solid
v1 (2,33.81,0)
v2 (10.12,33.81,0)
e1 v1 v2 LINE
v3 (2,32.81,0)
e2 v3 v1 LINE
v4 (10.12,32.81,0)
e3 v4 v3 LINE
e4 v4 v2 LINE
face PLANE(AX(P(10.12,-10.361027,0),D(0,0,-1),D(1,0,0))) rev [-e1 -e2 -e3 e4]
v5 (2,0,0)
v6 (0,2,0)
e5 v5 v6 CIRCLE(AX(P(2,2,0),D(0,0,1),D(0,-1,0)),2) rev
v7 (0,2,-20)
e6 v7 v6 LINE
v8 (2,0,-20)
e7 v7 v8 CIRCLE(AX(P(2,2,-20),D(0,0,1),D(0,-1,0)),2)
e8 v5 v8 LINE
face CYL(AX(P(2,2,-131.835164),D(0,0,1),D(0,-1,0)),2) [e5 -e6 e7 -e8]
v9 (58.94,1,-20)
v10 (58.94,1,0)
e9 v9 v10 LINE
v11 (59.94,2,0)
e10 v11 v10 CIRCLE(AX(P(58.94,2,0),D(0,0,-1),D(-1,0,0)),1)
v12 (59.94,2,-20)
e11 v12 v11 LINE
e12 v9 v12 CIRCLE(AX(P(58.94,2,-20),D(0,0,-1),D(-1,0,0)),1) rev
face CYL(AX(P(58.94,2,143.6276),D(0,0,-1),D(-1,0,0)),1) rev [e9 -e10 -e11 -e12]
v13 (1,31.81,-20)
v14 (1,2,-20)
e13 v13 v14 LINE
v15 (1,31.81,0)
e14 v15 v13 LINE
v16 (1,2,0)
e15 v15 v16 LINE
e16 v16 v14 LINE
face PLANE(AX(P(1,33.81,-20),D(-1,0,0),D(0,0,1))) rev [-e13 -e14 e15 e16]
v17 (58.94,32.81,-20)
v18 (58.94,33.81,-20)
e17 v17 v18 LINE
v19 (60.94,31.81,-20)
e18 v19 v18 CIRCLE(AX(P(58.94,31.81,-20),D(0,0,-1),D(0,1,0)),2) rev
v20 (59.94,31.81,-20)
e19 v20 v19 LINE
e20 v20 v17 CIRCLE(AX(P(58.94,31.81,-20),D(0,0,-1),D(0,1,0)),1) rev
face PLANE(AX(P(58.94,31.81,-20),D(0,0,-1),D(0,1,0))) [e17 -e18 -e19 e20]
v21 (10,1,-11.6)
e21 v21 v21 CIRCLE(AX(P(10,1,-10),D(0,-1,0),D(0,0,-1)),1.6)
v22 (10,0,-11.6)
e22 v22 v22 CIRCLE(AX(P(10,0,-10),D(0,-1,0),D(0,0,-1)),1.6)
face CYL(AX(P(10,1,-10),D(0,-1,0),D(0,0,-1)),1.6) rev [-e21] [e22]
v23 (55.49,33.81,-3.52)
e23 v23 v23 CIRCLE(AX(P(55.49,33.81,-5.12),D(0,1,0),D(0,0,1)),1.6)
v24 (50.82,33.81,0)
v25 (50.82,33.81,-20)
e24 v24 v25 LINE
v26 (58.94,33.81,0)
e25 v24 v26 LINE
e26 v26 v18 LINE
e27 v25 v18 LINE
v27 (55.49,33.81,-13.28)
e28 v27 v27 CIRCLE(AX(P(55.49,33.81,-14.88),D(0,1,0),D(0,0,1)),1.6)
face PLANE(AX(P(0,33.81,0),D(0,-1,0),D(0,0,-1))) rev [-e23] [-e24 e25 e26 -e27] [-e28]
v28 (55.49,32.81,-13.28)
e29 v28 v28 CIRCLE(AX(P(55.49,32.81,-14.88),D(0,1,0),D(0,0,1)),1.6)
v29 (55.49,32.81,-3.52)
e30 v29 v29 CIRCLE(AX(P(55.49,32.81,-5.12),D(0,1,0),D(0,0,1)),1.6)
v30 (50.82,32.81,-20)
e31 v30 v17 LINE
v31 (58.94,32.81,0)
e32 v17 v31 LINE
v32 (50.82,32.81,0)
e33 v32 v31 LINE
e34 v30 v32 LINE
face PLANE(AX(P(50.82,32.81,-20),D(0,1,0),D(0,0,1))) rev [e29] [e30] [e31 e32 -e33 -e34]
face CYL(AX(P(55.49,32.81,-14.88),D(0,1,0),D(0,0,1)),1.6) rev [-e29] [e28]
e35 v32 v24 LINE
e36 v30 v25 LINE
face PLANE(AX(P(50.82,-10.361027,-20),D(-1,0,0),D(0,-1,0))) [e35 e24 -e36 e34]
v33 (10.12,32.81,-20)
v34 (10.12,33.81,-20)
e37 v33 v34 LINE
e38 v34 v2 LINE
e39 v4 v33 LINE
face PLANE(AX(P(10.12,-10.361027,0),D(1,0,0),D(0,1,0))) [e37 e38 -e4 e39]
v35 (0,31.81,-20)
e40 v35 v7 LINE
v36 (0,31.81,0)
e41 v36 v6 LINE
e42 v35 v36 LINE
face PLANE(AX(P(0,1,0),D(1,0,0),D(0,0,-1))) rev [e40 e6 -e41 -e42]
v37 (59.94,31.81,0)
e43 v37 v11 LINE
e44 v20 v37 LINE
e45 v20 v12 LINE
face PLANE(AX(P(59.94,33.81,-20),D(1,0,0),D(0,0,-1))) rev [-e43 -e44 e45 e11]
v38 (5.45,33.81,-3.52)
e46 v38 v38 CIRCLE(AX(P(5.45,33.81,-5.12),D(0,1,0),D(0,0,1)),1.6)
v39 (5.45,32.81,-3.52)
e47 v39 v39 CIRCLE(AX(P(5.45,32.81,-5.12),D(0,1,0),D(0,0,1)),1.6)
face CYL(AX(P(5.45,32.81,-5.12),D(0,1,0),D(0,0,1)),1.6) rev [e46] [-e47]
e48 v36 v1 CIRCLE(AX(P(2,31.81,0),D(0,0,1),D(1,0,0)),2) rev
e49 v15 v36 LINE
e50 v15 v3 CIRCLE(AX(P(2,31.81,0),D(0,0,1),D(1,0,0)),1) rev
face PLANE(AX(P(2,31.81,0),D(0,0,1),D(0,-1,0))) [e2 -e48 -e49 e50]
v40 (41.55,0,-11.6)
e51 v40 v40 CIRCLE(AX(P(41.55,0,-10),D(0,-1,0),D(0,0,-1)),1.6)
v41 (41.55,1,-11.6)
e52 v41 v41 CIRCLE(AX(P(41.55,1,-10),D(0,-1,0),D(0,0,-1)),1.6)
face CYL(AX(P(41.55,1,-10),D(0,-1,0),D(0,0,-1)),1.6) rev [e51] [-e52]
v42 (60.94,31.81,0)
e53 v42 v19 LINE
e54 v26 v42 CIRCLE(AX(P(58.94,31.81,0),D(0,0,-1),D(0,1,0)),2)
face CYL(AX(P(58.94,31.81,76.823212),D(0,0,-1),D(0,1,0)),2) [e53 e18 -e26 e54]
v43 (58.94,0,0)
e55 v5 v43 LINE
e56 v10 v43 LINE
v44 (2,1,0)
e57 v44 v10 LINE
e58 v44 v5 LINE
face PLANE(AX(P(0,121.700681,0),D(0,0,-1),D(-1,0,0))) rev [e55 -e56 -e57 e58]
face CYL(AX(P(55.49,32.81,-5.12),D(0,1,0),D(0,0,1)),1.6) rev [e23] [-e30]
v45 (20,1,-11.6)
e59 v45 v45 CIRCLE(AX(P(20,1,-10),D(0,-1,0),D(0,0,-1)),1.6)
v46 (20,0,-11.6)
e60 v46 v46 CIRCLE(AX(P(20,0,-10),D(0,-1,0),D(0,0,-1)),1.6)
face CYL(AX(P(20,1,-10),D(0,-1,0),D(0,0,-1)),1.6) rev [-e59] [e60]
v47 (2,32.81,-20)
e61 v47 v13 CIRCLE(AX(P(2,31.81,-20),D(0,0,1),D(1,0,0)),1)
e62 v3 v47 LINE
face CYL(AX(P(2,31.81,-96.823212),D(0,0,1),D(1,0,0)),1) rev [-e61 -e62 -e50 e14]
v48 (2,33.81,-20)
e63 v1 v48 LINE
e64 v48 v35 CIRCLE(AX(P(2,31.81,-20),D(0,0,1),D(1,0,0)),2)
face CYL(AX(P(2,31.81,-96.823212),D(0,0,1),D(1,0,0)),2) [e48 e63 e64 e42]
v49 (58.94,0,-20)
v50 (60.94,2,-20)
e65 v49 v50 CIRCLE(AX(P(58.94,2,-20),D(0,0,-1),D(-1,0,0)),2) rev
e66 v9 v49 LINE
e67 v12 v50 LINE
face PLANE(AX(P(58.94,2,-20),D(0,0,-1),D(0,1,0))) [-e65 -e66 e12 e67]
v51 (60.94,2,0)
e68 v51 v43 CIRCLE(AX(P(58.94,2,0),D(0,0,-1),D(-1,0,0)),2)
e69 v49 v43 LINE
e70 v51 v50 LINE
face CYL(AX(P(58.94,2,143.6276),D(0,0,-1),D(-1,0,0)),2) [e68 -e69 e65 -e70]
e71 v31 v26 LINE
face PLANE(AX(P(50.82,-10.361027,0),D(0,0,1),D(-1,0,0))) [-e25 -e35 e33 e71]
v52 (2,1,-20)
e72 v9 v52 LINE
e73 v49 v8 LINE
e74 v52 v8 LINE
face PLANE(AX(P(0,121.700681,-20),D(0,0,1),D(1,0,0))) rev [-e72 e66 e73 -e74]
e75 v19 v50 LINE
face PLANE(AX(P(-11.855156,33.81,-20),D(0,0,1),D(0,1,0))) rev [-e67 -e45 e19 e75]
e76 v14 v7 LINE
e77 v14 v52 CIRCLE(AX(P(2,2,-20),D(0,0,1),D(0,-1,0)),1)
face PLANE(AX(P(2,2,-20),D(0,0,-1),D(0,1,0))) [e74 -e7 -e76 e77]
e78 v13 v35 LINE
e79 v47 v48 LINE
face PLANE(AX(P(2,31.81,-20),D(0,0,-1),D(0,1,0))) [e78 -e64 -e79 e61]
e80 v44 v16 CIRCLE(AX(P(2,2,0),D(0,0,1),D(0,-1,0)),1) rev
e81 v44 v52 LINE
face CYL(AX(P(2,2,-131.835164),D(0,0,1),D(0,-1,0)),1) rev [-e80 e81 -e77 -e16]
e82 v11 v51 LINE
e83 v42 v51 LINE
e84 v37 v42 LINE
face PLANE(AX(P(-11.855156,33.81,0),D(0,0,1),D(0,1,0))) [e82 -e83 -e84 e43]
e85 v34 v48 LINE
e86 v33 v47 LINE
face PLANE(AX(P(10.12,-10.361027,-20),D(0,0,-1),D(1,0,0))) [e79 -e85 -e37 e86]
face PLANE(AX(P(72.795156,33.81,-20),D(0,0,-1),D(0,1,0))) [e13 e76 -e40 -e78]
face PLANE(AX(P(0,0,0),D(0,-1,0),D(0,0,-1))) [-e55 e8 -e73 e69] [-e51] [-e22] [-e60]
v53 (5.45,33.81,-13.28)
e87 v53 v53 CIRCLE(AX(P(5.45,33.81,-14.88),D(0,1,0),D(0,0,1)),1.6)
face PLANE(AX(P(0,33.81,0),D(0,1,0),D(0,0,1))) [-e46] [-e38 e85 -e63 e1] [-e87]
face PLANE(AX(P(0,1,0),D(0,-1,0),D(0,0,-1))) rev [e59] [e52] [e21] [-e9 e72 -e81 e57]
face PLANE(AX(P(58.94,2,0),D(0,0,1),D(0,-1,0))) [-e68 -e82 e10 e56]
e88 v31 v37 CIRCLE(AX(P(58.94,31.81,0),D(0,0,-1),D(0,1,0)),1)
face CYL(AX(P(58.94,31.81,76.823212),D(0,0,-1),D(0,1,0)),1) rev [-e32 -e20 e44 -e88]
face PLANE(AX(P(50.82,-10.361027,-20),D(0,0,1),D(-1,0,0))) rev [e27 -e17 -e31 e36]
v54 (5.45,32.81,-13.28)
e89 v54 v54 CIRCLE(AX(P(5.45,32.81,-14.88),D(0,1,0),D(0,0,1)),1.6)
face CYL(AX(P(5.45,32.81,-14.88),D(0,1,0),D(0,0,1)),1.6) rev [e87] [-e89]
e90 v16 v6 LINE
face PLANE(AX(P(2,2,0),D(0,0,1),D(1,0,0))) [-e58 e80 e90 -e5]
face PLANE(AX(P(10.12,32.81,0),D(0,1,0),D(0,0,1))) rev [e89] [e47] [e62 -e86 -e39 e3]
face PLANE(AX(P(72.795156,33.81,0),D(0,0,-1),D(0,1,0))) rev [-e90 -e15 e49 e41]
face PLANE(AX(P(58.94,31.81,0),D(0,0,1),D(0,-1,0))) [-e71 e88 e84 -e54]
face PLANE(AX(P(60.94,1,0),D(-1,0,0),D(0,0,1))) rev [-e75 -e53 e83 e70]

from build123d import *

# Parameters (mm, degrees)
SKETCH_2_W                  = 60.94
SKETCH_2_H                  = 20
EXTRUDE_1_DEPTH             = 1
SKETCH_3_W                  = 1
SKETCH_3_H                  = 20
EXTRUDE_2_DEPTH             = 32.81
SKETCH_4_W                  = 1
SKETCH_4_H                  = 20
EXTRUDE_3_DEPTH             = 32.81
SKETCH_9_W                  = 20
SKETCH_9_H                  = 1
EXTRUDE_8_DEPTH             = 9.12
SKETCH_10_W                 = 20
SKETCH_10_H                 = 1
EXTRUDE_9_DEPTH             = 9.12
SKETCH_13_R                 = 1.6
CUT_EXTRUDE_2_DEPTH         = 1
SKETCH_14_R                 = 1.6
CUT_EXTRUDE_3_DEPTH         = 1
SKETCH_15_R                 = 1.6
CUT_EXTRUDE_4_DEPTH         = 1
SKETCH_16_R                 = 1.6
CUT_EXTRUDE_5_DEPTH         = 1
SKETCH_17_R                 = 1.6
CUT_EXTRUDE_6_DEPTH         = 1
SKETCH_18_R                 = 1.6
CUT_EXTRUDE_7_DEPTH         = 1
SKETCH_19_R                 = 1.6
CUT_EXTRUDE_8_DEPTH         = 1
SHEET_START                 = 1
SHEET_METAL_1_OUTLINE_W     = 10.12
SHEET_METAL_1_OUTLINE_H     = 20
SHEET_METAL_1_OUTLINE_R     = 1.6
SHEET_METAL_1_DEPTH         = 32.81
SHEET_METAL_1_2_OUTLINE_W   = 40.64238898
SHEET_METAL_1_2_OUTLINE_H   = 20
SHEET_METAL_1_2_OUTLINE_R   = 1.6
SHEET_METAL_1_2_DEPTH       = 1
SHEET_START_2               = -20
SHEET_METAL_1_3_DEPTH       = 20
SHEET_START_3               = -13.2799999
SHEET_METAL_1_3_2_DEPTH     = 6.5599998
SHEET_METAL_1_3_3_DEPTH     = 3.5199999
SHEET_START_4               = -3.5199999
SHEET_METAL_1_3_4_DEPTH     = 3.5199999
SHEET_START_5               = -16.4800001
SHEET_METAL_1_3_5_DEPTH     = 12.9600002
SHEET_START_6               = 32.81
SHEET_METAL_1_3_6_OUTLINE_R = 1.6
SHEET_METAL_1_3_6_DEPTH     = 1


with BuildPart() as part:
    # Sketch 2 → ﾎﾞｽ - 押し出し1 (new body)
    with BuildSketch(Plane(origin=(0, 0, 0), x_dir=(1, 0, 0), z_dir=(0, 1, 0))):
        with Locations((30.47, 10)):
            Rectangle(SKETCH_2_W, SKETCH_2_H)
    extrude(amount=EXTRUDE_1_DEPTH)

    # ｽｹｯﾁ3 → ﾎﾞｽ - 押し出し2 (add)
    with BuildSketch(Plane(origin=(0, 1, 0), x_dir=(1, 0, 0), z_dir=(0, 1, 0))):
        with Locations((60.44, 10)):
            Rectangle(SKETCH_3_W, SKETCH_3_H)
    extrude(amount=EXTRUDE_2_DEPTH)

    # ｽｹｯﾁ4 → ﾎﾞｽ - 押し出し3 (add)
    with BuildSketch(Plane(origin=(0, 1, 0), x_dir=(1, 0, 0), z_dir=(0, 1, 0))):
        with Locations((0.5, 10)):
            Rectangle(SKETCH_4_W, SKETCH_4_H)
    extrude(amount=EXTRUDE_3_DEPTH)

    # ｽｹｯﾁ9 → ﾎﾞｽ - 押し出し8 (add)
    with BuildSketch(Plane.ZY.offset(-59.94)):
        with Locations((-10, 33.31)):
            Rectangle(SKETCH_9_W, SKETCH_9_H)
    extrude(amount=EXTRUDE_8_DEPTH)

    # ｽｹｯﾁ10 → ﾎﾞｽ - 押し出し9 (add)
    with BuildSketch(Plane(origin=(1, 0, 0), x_dir=(0, 0, -1), z_dir=(1, 0, 0))):
        with Locations((10, 33.31)):
            Rectangle(SKETCH_10_W, SKETCH_10_H)
    extrude(amount=EXTRUDE_9_DEPTH)

    # ｽｹｯﾁ13 → ｶｯﾄ - 押し出し2 (cut)
    with BuildSketch(Plane(origin=(0, 33.81, 0), x_dir=(1, 0, 0), z_dir=(0, 1, 0))):
        with Locations(Location((55.49, 5.12, 0), (0, 0, 270))):
            Circle(SKETCH_13_R)
    extrude(amount=-CUT_EXTRUDE_2_DEPTH, mode=Mode.SUBTRACT)

    # ｽｹｯﾁ14 → ｶｯﾄ - 押し出し3 (cut)
    with BuildSketch(Plane(origin=(0, 33.81, 0), x_dir=(1, 0, 0), z_dir=(0, 1, 0))):
        with Locations(Location((55.49, 14.88, 0), (0, 0, 270))):
            Circle(SKETCH_14_R)
    extrude(amount=-CUT_EXTRUDE_3_DEPTH, mode=Mode.SUBTRACT)

    # ｽｹｯﾁ15 → ｶｯﾄ - 押し出し4 (cut)
    with BuildSketch(Plane(origin=(0, 33.81, 0), x_dir=(1, 0, 0), z_dir=(0, 1, 0))):
        with Locations(Location((5.45, 5.12, 0), (0, 0, 270))):
            Circle(SKETCH_15_R)
    extrude(amount=-CUT_EXTRUDE_4_DEPTH, mode=Mode.SUBTRACT)

    # ｽｹｯﾁ16 → ｶｯﾄ - 押し出し5 (cut)
    with BuildSketch(Plane(origin=(0, 33.81, 0), x_dir=(1, 0, 0), z_dir=(0, 1, 0))):
        with Locations(Location((5.45, 14.88, 0), (0, 0, 270))):
            Circle(SKETCH_16_R)
    extrude(amount=-CUT_EXTRUDE_5_DEPTH, mode=Mode.SUBTRACT)

    # ｽｹｯﾁ17 → ｶｯﾄ - 押し出し6 (cut)
    with BuildSketch(Plane(origin=(0, 0, 0), x_dir=(-1, 0, 0), z_dir=(0, -1, 0))):
        with Locations(Location((-41.55, 10, 0), (0, 0, 90))):
            Circle(SKETCH_17_R)
    extrude(amount=-CUT_EXTRUDE_6_DEPTH, mode=Mode.SUBTRACT)

    # ｽｹｯﾁ18 → ｶｯﾄ - 押し出し7 (cut)
    with BuildSketch(Plane(origin=(0, 0, 0), x_dir=(-1, 0, 0), z_dir=(0, -1, 0))):
        with Locations(Location((-10, 10, 0), (0, 0, 90))):
            Circle(SKETCH_18_R)
    extrude(amount=-CUT_EXTRUDE_7_DEPTH, mode=Mode.SUBTRACT)

    # ｽｹｯﾁ19 → ｶｯﾄ - 押し出し8 (cut)
    with BuildSketch(Plane(origin=(0, 0, 0), x_dir=(-1, 0, 0), z_dir=(0, -1, 0))):
        with Locations(Location((-20, 10, 0), (0, 0, 90))):
            Circle(SKETCH_19_R)
    extrude(amount=-CUT_EXTRUDE_8_DEPTH, mode=Mode.SUBTRACT)

    # Sheet Metal 1: read off the stored shape, not the designer's step
    # Sheet Metal 1 outline → Sheet Metal 1 (cut)
    # profile 1 of 2: a face of its own
    with BuildSketch(Plane(origin=(0, 0, 0), x_dir=(1, 0, 0), z_dir=(0, 1, 0)).offset(SHEET_START)):
        with Locations((55.88, 10)):
            Rectangle(SHEET_METAL_1_OUTLINE_W, SHEET_METAL_1_OUTLINE_H)
        with Locations((55.49, 14.88)):
            Circle(SHEET_METAL_1_OUTLINE_R, mode=Mode.SUBTRACT)
        with Locations((55.49, 5.12)):
            Circle(SHEET_METAL_1_OUTLINE_R, mode=Mode.SUBTRACT)
    # profile 2 of 2: a face of its own
    with BuildSketch(Plane(origin=(0, 0, 0), x_dir=(1, 0, 0), z_dir=(0, 1, 0)).offset(SHEET_START)):
        with Locations((5.06, 10)):
            Rectangle(SHEET_METAL_1_OUTLINE_W, SHEET_METAL_1_OUTLINE_H)
        with Locations((5.45, 5.12)):
            Circle(SHEET_METAL_1_OUTLINE_R, mode=Mode.SUBTRACT)
        with Locations((5.45, 14.88)):
            Circle(SHEET_METAL_1_OUTLINE_R, mode=Mode.SUBTRACT)
    extrude(amount=SHEET_METAL_1_DEPTH, mode=Mode.SUBTRACT)

    # Sheet Metal 1 2 outline → Sheet Metal 1 2 (add)
    # profile 1 of 2: a face of its own
    with BuildSketch(Plane(origin=(0, 0, 0), x_dir=(1, 0, 0), z_dir=(0, 1, 0))):
        with Locations((81.26119449, 10)):
            Rectangle(SHEET_METAL_1_2_OUTLINE_W, SHEET_METAL_1_2_OUTLINE_H)
        with Locations((96.91238898, 5.12)):
            Circle(SHEET_METAL_1_2_OUTLINE_R, mode=Mode.SUBTRACT)
        with Locations((96.91238898, 14.88)):
            Circle(SHEET_METAL_1_2_OUTLINE_R, mode=Mode.SUBTRACT)
    # profile 2 of 2: a face of its own
    with BuildSketch(Plane(origin=(0, 0, 0), x_dir=(1, 0, 0), z_dir=(0, 1, 0))):
        with Locations((-20.32119449, 10)):
            Rectangle(SHEET_METAL_1_2_OUTLINE_W, SHEET_METAL_1_2_OUTLINE_H)
        with Locations((-35.97238898, 5.12)):
            Circle(SHEET_METAL_1_2_OUTLINE_R, mode=Mode.SUBTRACT)
        with Locations((-35.97238898, 14.88)):
            Circle(SHEET_METAL_1_2_OUTLINE_R, mode=Mode.SUBTRACT)
    extrude(amount=SHEET_METAL_1_2_DEPTH)

    # Sheet Metal 1 3: read off the stored shape, not the designer's step
    # Sheet Metal 1 3 outline → Sheet Metal 1 3 (cut)
    with BuildSketch(Plane.XY.offset(SHEET_START_2)):
        with BuildLine():
            ThreePointArc((2, 0), (1, 0.267949193), (0.267949193, 1))
            Line((0.267949193, 1), (-40.64238898, 1))
            Line((-40.64238898, 1), (-40.64238898, 0))
            Line((-40.64238898, 0), (2, 0))
        make_face()
        with BuildLine():
            Line((101.58238898, 1), (60.672050807, 1))
            ThreePointArc((60.672050807, 1), (59.94, 0.267949193), (58.94, 0))
            Line((58.94, 0), (101.58238898, 0))
            Line((101.58238898, 0), (101.58238898, 1))
        make_face()
    extrude(amount=SHEET_METAL_1_3_DEPTH, mode=Mode.SUBTRACT)

    # Sheet Metal 1 3 2 outline → Sheet Metal 1 3 2 (add)
    with BuildSketch(Plane.XY.offset(SHEET_START_3)):
        with BuildLine():
            Line((2, 32.81), (10.12, 32.81))
            Line((10.12, 32.81), (10.12, 33.81))
            Line((10.12, 33.81), (2, 33.81))
            ThreePointArc((2, 33.81), (0.585786438, 33.224213562), (0, 31.81))
            Line((0, 31.81), (0, 2))
            ThreePointArc((0, 2), (0.068148348, 1.48236191), (0.267949193, 1))
            Line((0.267949193, 1), (2, 1))
            ThreePointArc((2, 1), (1.292893219, 1.292893219), (1, 2))
            Line((1, 2), (1, 31.81))
            ThreePointArc((1, 31.81), (1.292893219, 32.517106781), (2, 32.81))
        make_face()
        with BuildLine():
            Line((58.94, 33.81), (50.82, 33.81))
            Line((50.82, 33.81), (50.82, 32.81))
            Line((50.82, 32.81), (58.94, 32.81))
            ThreePointArc((58.94, 32.81), (59.647106781, 32.517106781), (59.94, 31.81))
            Line((59.94, 31.81), (59.94, 2))
            ThreePointArc((59.94, 2), (59.647106781, 1.292893219), (58.94, 1))
            Line((58.94, 1), (60.672050807, 1))
            ThreePointArc((60.672050807, 1), (60.871851652, 1.48236191), (60.94, 2))
            Line((60.94, 2), (60.94, 31.81))
            ThreePointArc((60.94, 31.81), (60.354213562, 33.224213562), (58.94, 33.81))
        make_face()
    extrude(amount=SHEET_METAL_1_3_2_DEPTH)

    # Sheet Metal 1 3 3 outline → Sheet Metal 1 3 3 (add)
    with BuildSketch(Plane.XY.offset(SHEET_START_2)):
        with BuildLine():
            Line((2, 32.81), (10.12, 32.81))
            Line((10.12, 32.81), (10.12, 33.81))
            Line((10.12, 33.81), (2, 33.81))
            ThreePointArc((2, 33.81), (0.585786438, 33.224213562), (0, 31.81))
            Line((0, 31.81), (0, 2))
            ThreePointArc((0, 2), (0.068148348, 1.48236191), (0.267949193, 1))
            Line((0.267949193, 1), (2, 1))
            ThreePointArc((2, 1), (1.292893219, 1.292893219), (1, 2))
            Line((1, 2), (1, 31.81))
            ThreePointArc((1, 31.81), (1.292893219, 32.517106781), (2, 32.81))
        make_face()
        with BuildLine():
            Line((58.94, 33.81), (50.82, 33.81))
            Line((50.82, 33.81), (50.82, 32.81))
            Line((50.82, 32.81), (58.94, 32.81))
            ThreePointArc((58.94, 32.81), (59.647106781, 32.517106781), (59.94, 31.81))
            Line((59.94, 31.81), (59.94, 2))
            ThreePointArc((59.94, 2), (59.647106781, 1.292893219), (58.94, 1))
            Line((58.94, 1), (60.672050807, 1))
            ThreePointArc((60.672050807, 1), (60.871851652, 1.48236191), (60.94, 2))
            Line((60.94, 2), (60.94, 31.81))
            ThreePointArc((60.94, 31.81), (60.354213562, 33.224213562), (58.94, 33.81))
        make_face()
    extrude(amount=SHEET_METAL_1_3_3_DEPTH)

    # Sheet Metal 1 3 4 outline → Sheet Metal 1 3 4 (add)
    with BuildSketch(Plane.XY.offset(SHEET_START_4)):
        with BuildLine():
            Line((2, 32.81), (10.12, 32.81))
            Line((10.12, 32.81), (10.12, 33.81))
            Line((10.12, 33.81), (2, 33.81))
            ThreePointArc((2, 33.81), (0.585786438, 33.224213562), (0, 31.81))
            Line((0, 31.81), (0, 2))
            ThreePointArc((0, 2), (0.068148348, 1.48236191), (0.267949193, 1))
            Line((0.267949193, 1), (2, 1))
            ThreePointArc((2, 1), (1.292893219, 1.292893219), (1, 2))
            Line((1, 2), (1, 31.81))
            ThreePointArc((1, 31.81), (1.292893219, 32.517106781), (2, 32.81))
        make_face()
        with BuildLine():
            Line((58.94, 33.81), (50.82, 33.81))
            Line((50.82, 33.81), (50.82, 32.81))
            Line((50.82, 32.81), (58.94, 32.81))
            ThreePointArc((58.94, 32.81), (59.647106781, 32.517106781), (59.94, 31.81))
            Line((59.94, 31.81), (59.94, 2))
            ThreePointArc((59.94, 2), (59.647106781, 1.292893219), (58.94, 1))
            Line((58.94, 1), (60.672050807, 1))
            ThreePointArc((60.672050807, 1), (60.871851652, 1.48236191), (60.94, 2))
            Line((60.94, 2), (60.94, 31.81))
            ThreePointArc((60.94, 31.81), (60.354213562, 33.224213562), (58.94, 33.81))
        make_face()
    extrude(amount=SHEET_METAL_1_3_4_DEPTH)

    # Sheet Metal 1 3 5 outline → Sheet Metal 1 3 5 (add)
    with BuildSketch(Plane.XY.offset(SHEET_START_5)):
        with BuildLine():
            Line((2, 32.81), (10.12, 32.81))
            Line((10.12, 32.81), (10.12, 33.81))
            Line((10.12, 33.81), (2, 33.81))
            ThreePointArc((2, 33.81), (0.585786438, 33.224213562), (0, 31.81))
            Line((0, 31.81), (0, 2))
            ThreePointArc((0, 2), (0.068148348, 1.48236191), (0.267949193, 1))
            Line((0.267949193, 1), (2, 1))
            ThreePointArc((2, 1), (1.292893219, 1.292893219), (1, 2))
            Line((1, 2), (1, 31.81))
            ThreePointArc((1, 31.81), (1.292893219, 32.517106781), (2, 32.81))
        make_face()
        with BuildLine():
            ThreePointArc((59.94, 2), (59.647106781, 1.292893219), (58.94, 1))
            Line((58.94, 1), (60.672050807, 1))
            ThreePointArc((60.672050807, 1), (60.871851652, 1.48236191), (60.94, 2))
            Line((60.94, 2), (60.94, 31.81))
            ThreePointArc((60.94, 31.81), (60.354213562, 33.224213562), (58.94, 33.81))
            Line((58.94, 33.81), (50.82, 33.81))
            Line((50.82, 33.81), (50.82, 32.81))
            Line((50.82, 32.81), (58.94, 32.81))
            ThreePointArc((58.94, 32.81), (59.647106781, 32.517106781), (59.94, 31.81))
            Line((59.94, 31.81), (59.94, 2))
        make_face()
    extrude(amount=SHEET_METAL_1_3_5_DEPTH)

    # Sheet Metal 1 3 6 outline → Sheet Metal 1 3 6 (cut)
    with BuildSketch(Plane(origin=(0, 0, 0), x_dir=(1, 0, 0), z_dir=(0, 1, 0)).offset(SHEET_START_6)):
        with Locations((5.45, 5.12)):
            Circle(SHEET_METAL_1_3_6_OUTLINE_R)
        with Locations((5.45, 14.88)):
            Circle(SHEET_METAL_1_3_6_OUTLINE_R)
        with Locations((55.49, 5.12)):
            Circle(SHEET_METAL_1_3_6_OUTLINE_R)
        with Locations((55.49, 14.88)):
            Circle(SHEET_METAL_1_3_6_OUTLINE_R)
    extrude(amount=SHEET_METAL_1_3_6_DEPTH, mode=Mode.SUBTRACT)


solid = part.part
